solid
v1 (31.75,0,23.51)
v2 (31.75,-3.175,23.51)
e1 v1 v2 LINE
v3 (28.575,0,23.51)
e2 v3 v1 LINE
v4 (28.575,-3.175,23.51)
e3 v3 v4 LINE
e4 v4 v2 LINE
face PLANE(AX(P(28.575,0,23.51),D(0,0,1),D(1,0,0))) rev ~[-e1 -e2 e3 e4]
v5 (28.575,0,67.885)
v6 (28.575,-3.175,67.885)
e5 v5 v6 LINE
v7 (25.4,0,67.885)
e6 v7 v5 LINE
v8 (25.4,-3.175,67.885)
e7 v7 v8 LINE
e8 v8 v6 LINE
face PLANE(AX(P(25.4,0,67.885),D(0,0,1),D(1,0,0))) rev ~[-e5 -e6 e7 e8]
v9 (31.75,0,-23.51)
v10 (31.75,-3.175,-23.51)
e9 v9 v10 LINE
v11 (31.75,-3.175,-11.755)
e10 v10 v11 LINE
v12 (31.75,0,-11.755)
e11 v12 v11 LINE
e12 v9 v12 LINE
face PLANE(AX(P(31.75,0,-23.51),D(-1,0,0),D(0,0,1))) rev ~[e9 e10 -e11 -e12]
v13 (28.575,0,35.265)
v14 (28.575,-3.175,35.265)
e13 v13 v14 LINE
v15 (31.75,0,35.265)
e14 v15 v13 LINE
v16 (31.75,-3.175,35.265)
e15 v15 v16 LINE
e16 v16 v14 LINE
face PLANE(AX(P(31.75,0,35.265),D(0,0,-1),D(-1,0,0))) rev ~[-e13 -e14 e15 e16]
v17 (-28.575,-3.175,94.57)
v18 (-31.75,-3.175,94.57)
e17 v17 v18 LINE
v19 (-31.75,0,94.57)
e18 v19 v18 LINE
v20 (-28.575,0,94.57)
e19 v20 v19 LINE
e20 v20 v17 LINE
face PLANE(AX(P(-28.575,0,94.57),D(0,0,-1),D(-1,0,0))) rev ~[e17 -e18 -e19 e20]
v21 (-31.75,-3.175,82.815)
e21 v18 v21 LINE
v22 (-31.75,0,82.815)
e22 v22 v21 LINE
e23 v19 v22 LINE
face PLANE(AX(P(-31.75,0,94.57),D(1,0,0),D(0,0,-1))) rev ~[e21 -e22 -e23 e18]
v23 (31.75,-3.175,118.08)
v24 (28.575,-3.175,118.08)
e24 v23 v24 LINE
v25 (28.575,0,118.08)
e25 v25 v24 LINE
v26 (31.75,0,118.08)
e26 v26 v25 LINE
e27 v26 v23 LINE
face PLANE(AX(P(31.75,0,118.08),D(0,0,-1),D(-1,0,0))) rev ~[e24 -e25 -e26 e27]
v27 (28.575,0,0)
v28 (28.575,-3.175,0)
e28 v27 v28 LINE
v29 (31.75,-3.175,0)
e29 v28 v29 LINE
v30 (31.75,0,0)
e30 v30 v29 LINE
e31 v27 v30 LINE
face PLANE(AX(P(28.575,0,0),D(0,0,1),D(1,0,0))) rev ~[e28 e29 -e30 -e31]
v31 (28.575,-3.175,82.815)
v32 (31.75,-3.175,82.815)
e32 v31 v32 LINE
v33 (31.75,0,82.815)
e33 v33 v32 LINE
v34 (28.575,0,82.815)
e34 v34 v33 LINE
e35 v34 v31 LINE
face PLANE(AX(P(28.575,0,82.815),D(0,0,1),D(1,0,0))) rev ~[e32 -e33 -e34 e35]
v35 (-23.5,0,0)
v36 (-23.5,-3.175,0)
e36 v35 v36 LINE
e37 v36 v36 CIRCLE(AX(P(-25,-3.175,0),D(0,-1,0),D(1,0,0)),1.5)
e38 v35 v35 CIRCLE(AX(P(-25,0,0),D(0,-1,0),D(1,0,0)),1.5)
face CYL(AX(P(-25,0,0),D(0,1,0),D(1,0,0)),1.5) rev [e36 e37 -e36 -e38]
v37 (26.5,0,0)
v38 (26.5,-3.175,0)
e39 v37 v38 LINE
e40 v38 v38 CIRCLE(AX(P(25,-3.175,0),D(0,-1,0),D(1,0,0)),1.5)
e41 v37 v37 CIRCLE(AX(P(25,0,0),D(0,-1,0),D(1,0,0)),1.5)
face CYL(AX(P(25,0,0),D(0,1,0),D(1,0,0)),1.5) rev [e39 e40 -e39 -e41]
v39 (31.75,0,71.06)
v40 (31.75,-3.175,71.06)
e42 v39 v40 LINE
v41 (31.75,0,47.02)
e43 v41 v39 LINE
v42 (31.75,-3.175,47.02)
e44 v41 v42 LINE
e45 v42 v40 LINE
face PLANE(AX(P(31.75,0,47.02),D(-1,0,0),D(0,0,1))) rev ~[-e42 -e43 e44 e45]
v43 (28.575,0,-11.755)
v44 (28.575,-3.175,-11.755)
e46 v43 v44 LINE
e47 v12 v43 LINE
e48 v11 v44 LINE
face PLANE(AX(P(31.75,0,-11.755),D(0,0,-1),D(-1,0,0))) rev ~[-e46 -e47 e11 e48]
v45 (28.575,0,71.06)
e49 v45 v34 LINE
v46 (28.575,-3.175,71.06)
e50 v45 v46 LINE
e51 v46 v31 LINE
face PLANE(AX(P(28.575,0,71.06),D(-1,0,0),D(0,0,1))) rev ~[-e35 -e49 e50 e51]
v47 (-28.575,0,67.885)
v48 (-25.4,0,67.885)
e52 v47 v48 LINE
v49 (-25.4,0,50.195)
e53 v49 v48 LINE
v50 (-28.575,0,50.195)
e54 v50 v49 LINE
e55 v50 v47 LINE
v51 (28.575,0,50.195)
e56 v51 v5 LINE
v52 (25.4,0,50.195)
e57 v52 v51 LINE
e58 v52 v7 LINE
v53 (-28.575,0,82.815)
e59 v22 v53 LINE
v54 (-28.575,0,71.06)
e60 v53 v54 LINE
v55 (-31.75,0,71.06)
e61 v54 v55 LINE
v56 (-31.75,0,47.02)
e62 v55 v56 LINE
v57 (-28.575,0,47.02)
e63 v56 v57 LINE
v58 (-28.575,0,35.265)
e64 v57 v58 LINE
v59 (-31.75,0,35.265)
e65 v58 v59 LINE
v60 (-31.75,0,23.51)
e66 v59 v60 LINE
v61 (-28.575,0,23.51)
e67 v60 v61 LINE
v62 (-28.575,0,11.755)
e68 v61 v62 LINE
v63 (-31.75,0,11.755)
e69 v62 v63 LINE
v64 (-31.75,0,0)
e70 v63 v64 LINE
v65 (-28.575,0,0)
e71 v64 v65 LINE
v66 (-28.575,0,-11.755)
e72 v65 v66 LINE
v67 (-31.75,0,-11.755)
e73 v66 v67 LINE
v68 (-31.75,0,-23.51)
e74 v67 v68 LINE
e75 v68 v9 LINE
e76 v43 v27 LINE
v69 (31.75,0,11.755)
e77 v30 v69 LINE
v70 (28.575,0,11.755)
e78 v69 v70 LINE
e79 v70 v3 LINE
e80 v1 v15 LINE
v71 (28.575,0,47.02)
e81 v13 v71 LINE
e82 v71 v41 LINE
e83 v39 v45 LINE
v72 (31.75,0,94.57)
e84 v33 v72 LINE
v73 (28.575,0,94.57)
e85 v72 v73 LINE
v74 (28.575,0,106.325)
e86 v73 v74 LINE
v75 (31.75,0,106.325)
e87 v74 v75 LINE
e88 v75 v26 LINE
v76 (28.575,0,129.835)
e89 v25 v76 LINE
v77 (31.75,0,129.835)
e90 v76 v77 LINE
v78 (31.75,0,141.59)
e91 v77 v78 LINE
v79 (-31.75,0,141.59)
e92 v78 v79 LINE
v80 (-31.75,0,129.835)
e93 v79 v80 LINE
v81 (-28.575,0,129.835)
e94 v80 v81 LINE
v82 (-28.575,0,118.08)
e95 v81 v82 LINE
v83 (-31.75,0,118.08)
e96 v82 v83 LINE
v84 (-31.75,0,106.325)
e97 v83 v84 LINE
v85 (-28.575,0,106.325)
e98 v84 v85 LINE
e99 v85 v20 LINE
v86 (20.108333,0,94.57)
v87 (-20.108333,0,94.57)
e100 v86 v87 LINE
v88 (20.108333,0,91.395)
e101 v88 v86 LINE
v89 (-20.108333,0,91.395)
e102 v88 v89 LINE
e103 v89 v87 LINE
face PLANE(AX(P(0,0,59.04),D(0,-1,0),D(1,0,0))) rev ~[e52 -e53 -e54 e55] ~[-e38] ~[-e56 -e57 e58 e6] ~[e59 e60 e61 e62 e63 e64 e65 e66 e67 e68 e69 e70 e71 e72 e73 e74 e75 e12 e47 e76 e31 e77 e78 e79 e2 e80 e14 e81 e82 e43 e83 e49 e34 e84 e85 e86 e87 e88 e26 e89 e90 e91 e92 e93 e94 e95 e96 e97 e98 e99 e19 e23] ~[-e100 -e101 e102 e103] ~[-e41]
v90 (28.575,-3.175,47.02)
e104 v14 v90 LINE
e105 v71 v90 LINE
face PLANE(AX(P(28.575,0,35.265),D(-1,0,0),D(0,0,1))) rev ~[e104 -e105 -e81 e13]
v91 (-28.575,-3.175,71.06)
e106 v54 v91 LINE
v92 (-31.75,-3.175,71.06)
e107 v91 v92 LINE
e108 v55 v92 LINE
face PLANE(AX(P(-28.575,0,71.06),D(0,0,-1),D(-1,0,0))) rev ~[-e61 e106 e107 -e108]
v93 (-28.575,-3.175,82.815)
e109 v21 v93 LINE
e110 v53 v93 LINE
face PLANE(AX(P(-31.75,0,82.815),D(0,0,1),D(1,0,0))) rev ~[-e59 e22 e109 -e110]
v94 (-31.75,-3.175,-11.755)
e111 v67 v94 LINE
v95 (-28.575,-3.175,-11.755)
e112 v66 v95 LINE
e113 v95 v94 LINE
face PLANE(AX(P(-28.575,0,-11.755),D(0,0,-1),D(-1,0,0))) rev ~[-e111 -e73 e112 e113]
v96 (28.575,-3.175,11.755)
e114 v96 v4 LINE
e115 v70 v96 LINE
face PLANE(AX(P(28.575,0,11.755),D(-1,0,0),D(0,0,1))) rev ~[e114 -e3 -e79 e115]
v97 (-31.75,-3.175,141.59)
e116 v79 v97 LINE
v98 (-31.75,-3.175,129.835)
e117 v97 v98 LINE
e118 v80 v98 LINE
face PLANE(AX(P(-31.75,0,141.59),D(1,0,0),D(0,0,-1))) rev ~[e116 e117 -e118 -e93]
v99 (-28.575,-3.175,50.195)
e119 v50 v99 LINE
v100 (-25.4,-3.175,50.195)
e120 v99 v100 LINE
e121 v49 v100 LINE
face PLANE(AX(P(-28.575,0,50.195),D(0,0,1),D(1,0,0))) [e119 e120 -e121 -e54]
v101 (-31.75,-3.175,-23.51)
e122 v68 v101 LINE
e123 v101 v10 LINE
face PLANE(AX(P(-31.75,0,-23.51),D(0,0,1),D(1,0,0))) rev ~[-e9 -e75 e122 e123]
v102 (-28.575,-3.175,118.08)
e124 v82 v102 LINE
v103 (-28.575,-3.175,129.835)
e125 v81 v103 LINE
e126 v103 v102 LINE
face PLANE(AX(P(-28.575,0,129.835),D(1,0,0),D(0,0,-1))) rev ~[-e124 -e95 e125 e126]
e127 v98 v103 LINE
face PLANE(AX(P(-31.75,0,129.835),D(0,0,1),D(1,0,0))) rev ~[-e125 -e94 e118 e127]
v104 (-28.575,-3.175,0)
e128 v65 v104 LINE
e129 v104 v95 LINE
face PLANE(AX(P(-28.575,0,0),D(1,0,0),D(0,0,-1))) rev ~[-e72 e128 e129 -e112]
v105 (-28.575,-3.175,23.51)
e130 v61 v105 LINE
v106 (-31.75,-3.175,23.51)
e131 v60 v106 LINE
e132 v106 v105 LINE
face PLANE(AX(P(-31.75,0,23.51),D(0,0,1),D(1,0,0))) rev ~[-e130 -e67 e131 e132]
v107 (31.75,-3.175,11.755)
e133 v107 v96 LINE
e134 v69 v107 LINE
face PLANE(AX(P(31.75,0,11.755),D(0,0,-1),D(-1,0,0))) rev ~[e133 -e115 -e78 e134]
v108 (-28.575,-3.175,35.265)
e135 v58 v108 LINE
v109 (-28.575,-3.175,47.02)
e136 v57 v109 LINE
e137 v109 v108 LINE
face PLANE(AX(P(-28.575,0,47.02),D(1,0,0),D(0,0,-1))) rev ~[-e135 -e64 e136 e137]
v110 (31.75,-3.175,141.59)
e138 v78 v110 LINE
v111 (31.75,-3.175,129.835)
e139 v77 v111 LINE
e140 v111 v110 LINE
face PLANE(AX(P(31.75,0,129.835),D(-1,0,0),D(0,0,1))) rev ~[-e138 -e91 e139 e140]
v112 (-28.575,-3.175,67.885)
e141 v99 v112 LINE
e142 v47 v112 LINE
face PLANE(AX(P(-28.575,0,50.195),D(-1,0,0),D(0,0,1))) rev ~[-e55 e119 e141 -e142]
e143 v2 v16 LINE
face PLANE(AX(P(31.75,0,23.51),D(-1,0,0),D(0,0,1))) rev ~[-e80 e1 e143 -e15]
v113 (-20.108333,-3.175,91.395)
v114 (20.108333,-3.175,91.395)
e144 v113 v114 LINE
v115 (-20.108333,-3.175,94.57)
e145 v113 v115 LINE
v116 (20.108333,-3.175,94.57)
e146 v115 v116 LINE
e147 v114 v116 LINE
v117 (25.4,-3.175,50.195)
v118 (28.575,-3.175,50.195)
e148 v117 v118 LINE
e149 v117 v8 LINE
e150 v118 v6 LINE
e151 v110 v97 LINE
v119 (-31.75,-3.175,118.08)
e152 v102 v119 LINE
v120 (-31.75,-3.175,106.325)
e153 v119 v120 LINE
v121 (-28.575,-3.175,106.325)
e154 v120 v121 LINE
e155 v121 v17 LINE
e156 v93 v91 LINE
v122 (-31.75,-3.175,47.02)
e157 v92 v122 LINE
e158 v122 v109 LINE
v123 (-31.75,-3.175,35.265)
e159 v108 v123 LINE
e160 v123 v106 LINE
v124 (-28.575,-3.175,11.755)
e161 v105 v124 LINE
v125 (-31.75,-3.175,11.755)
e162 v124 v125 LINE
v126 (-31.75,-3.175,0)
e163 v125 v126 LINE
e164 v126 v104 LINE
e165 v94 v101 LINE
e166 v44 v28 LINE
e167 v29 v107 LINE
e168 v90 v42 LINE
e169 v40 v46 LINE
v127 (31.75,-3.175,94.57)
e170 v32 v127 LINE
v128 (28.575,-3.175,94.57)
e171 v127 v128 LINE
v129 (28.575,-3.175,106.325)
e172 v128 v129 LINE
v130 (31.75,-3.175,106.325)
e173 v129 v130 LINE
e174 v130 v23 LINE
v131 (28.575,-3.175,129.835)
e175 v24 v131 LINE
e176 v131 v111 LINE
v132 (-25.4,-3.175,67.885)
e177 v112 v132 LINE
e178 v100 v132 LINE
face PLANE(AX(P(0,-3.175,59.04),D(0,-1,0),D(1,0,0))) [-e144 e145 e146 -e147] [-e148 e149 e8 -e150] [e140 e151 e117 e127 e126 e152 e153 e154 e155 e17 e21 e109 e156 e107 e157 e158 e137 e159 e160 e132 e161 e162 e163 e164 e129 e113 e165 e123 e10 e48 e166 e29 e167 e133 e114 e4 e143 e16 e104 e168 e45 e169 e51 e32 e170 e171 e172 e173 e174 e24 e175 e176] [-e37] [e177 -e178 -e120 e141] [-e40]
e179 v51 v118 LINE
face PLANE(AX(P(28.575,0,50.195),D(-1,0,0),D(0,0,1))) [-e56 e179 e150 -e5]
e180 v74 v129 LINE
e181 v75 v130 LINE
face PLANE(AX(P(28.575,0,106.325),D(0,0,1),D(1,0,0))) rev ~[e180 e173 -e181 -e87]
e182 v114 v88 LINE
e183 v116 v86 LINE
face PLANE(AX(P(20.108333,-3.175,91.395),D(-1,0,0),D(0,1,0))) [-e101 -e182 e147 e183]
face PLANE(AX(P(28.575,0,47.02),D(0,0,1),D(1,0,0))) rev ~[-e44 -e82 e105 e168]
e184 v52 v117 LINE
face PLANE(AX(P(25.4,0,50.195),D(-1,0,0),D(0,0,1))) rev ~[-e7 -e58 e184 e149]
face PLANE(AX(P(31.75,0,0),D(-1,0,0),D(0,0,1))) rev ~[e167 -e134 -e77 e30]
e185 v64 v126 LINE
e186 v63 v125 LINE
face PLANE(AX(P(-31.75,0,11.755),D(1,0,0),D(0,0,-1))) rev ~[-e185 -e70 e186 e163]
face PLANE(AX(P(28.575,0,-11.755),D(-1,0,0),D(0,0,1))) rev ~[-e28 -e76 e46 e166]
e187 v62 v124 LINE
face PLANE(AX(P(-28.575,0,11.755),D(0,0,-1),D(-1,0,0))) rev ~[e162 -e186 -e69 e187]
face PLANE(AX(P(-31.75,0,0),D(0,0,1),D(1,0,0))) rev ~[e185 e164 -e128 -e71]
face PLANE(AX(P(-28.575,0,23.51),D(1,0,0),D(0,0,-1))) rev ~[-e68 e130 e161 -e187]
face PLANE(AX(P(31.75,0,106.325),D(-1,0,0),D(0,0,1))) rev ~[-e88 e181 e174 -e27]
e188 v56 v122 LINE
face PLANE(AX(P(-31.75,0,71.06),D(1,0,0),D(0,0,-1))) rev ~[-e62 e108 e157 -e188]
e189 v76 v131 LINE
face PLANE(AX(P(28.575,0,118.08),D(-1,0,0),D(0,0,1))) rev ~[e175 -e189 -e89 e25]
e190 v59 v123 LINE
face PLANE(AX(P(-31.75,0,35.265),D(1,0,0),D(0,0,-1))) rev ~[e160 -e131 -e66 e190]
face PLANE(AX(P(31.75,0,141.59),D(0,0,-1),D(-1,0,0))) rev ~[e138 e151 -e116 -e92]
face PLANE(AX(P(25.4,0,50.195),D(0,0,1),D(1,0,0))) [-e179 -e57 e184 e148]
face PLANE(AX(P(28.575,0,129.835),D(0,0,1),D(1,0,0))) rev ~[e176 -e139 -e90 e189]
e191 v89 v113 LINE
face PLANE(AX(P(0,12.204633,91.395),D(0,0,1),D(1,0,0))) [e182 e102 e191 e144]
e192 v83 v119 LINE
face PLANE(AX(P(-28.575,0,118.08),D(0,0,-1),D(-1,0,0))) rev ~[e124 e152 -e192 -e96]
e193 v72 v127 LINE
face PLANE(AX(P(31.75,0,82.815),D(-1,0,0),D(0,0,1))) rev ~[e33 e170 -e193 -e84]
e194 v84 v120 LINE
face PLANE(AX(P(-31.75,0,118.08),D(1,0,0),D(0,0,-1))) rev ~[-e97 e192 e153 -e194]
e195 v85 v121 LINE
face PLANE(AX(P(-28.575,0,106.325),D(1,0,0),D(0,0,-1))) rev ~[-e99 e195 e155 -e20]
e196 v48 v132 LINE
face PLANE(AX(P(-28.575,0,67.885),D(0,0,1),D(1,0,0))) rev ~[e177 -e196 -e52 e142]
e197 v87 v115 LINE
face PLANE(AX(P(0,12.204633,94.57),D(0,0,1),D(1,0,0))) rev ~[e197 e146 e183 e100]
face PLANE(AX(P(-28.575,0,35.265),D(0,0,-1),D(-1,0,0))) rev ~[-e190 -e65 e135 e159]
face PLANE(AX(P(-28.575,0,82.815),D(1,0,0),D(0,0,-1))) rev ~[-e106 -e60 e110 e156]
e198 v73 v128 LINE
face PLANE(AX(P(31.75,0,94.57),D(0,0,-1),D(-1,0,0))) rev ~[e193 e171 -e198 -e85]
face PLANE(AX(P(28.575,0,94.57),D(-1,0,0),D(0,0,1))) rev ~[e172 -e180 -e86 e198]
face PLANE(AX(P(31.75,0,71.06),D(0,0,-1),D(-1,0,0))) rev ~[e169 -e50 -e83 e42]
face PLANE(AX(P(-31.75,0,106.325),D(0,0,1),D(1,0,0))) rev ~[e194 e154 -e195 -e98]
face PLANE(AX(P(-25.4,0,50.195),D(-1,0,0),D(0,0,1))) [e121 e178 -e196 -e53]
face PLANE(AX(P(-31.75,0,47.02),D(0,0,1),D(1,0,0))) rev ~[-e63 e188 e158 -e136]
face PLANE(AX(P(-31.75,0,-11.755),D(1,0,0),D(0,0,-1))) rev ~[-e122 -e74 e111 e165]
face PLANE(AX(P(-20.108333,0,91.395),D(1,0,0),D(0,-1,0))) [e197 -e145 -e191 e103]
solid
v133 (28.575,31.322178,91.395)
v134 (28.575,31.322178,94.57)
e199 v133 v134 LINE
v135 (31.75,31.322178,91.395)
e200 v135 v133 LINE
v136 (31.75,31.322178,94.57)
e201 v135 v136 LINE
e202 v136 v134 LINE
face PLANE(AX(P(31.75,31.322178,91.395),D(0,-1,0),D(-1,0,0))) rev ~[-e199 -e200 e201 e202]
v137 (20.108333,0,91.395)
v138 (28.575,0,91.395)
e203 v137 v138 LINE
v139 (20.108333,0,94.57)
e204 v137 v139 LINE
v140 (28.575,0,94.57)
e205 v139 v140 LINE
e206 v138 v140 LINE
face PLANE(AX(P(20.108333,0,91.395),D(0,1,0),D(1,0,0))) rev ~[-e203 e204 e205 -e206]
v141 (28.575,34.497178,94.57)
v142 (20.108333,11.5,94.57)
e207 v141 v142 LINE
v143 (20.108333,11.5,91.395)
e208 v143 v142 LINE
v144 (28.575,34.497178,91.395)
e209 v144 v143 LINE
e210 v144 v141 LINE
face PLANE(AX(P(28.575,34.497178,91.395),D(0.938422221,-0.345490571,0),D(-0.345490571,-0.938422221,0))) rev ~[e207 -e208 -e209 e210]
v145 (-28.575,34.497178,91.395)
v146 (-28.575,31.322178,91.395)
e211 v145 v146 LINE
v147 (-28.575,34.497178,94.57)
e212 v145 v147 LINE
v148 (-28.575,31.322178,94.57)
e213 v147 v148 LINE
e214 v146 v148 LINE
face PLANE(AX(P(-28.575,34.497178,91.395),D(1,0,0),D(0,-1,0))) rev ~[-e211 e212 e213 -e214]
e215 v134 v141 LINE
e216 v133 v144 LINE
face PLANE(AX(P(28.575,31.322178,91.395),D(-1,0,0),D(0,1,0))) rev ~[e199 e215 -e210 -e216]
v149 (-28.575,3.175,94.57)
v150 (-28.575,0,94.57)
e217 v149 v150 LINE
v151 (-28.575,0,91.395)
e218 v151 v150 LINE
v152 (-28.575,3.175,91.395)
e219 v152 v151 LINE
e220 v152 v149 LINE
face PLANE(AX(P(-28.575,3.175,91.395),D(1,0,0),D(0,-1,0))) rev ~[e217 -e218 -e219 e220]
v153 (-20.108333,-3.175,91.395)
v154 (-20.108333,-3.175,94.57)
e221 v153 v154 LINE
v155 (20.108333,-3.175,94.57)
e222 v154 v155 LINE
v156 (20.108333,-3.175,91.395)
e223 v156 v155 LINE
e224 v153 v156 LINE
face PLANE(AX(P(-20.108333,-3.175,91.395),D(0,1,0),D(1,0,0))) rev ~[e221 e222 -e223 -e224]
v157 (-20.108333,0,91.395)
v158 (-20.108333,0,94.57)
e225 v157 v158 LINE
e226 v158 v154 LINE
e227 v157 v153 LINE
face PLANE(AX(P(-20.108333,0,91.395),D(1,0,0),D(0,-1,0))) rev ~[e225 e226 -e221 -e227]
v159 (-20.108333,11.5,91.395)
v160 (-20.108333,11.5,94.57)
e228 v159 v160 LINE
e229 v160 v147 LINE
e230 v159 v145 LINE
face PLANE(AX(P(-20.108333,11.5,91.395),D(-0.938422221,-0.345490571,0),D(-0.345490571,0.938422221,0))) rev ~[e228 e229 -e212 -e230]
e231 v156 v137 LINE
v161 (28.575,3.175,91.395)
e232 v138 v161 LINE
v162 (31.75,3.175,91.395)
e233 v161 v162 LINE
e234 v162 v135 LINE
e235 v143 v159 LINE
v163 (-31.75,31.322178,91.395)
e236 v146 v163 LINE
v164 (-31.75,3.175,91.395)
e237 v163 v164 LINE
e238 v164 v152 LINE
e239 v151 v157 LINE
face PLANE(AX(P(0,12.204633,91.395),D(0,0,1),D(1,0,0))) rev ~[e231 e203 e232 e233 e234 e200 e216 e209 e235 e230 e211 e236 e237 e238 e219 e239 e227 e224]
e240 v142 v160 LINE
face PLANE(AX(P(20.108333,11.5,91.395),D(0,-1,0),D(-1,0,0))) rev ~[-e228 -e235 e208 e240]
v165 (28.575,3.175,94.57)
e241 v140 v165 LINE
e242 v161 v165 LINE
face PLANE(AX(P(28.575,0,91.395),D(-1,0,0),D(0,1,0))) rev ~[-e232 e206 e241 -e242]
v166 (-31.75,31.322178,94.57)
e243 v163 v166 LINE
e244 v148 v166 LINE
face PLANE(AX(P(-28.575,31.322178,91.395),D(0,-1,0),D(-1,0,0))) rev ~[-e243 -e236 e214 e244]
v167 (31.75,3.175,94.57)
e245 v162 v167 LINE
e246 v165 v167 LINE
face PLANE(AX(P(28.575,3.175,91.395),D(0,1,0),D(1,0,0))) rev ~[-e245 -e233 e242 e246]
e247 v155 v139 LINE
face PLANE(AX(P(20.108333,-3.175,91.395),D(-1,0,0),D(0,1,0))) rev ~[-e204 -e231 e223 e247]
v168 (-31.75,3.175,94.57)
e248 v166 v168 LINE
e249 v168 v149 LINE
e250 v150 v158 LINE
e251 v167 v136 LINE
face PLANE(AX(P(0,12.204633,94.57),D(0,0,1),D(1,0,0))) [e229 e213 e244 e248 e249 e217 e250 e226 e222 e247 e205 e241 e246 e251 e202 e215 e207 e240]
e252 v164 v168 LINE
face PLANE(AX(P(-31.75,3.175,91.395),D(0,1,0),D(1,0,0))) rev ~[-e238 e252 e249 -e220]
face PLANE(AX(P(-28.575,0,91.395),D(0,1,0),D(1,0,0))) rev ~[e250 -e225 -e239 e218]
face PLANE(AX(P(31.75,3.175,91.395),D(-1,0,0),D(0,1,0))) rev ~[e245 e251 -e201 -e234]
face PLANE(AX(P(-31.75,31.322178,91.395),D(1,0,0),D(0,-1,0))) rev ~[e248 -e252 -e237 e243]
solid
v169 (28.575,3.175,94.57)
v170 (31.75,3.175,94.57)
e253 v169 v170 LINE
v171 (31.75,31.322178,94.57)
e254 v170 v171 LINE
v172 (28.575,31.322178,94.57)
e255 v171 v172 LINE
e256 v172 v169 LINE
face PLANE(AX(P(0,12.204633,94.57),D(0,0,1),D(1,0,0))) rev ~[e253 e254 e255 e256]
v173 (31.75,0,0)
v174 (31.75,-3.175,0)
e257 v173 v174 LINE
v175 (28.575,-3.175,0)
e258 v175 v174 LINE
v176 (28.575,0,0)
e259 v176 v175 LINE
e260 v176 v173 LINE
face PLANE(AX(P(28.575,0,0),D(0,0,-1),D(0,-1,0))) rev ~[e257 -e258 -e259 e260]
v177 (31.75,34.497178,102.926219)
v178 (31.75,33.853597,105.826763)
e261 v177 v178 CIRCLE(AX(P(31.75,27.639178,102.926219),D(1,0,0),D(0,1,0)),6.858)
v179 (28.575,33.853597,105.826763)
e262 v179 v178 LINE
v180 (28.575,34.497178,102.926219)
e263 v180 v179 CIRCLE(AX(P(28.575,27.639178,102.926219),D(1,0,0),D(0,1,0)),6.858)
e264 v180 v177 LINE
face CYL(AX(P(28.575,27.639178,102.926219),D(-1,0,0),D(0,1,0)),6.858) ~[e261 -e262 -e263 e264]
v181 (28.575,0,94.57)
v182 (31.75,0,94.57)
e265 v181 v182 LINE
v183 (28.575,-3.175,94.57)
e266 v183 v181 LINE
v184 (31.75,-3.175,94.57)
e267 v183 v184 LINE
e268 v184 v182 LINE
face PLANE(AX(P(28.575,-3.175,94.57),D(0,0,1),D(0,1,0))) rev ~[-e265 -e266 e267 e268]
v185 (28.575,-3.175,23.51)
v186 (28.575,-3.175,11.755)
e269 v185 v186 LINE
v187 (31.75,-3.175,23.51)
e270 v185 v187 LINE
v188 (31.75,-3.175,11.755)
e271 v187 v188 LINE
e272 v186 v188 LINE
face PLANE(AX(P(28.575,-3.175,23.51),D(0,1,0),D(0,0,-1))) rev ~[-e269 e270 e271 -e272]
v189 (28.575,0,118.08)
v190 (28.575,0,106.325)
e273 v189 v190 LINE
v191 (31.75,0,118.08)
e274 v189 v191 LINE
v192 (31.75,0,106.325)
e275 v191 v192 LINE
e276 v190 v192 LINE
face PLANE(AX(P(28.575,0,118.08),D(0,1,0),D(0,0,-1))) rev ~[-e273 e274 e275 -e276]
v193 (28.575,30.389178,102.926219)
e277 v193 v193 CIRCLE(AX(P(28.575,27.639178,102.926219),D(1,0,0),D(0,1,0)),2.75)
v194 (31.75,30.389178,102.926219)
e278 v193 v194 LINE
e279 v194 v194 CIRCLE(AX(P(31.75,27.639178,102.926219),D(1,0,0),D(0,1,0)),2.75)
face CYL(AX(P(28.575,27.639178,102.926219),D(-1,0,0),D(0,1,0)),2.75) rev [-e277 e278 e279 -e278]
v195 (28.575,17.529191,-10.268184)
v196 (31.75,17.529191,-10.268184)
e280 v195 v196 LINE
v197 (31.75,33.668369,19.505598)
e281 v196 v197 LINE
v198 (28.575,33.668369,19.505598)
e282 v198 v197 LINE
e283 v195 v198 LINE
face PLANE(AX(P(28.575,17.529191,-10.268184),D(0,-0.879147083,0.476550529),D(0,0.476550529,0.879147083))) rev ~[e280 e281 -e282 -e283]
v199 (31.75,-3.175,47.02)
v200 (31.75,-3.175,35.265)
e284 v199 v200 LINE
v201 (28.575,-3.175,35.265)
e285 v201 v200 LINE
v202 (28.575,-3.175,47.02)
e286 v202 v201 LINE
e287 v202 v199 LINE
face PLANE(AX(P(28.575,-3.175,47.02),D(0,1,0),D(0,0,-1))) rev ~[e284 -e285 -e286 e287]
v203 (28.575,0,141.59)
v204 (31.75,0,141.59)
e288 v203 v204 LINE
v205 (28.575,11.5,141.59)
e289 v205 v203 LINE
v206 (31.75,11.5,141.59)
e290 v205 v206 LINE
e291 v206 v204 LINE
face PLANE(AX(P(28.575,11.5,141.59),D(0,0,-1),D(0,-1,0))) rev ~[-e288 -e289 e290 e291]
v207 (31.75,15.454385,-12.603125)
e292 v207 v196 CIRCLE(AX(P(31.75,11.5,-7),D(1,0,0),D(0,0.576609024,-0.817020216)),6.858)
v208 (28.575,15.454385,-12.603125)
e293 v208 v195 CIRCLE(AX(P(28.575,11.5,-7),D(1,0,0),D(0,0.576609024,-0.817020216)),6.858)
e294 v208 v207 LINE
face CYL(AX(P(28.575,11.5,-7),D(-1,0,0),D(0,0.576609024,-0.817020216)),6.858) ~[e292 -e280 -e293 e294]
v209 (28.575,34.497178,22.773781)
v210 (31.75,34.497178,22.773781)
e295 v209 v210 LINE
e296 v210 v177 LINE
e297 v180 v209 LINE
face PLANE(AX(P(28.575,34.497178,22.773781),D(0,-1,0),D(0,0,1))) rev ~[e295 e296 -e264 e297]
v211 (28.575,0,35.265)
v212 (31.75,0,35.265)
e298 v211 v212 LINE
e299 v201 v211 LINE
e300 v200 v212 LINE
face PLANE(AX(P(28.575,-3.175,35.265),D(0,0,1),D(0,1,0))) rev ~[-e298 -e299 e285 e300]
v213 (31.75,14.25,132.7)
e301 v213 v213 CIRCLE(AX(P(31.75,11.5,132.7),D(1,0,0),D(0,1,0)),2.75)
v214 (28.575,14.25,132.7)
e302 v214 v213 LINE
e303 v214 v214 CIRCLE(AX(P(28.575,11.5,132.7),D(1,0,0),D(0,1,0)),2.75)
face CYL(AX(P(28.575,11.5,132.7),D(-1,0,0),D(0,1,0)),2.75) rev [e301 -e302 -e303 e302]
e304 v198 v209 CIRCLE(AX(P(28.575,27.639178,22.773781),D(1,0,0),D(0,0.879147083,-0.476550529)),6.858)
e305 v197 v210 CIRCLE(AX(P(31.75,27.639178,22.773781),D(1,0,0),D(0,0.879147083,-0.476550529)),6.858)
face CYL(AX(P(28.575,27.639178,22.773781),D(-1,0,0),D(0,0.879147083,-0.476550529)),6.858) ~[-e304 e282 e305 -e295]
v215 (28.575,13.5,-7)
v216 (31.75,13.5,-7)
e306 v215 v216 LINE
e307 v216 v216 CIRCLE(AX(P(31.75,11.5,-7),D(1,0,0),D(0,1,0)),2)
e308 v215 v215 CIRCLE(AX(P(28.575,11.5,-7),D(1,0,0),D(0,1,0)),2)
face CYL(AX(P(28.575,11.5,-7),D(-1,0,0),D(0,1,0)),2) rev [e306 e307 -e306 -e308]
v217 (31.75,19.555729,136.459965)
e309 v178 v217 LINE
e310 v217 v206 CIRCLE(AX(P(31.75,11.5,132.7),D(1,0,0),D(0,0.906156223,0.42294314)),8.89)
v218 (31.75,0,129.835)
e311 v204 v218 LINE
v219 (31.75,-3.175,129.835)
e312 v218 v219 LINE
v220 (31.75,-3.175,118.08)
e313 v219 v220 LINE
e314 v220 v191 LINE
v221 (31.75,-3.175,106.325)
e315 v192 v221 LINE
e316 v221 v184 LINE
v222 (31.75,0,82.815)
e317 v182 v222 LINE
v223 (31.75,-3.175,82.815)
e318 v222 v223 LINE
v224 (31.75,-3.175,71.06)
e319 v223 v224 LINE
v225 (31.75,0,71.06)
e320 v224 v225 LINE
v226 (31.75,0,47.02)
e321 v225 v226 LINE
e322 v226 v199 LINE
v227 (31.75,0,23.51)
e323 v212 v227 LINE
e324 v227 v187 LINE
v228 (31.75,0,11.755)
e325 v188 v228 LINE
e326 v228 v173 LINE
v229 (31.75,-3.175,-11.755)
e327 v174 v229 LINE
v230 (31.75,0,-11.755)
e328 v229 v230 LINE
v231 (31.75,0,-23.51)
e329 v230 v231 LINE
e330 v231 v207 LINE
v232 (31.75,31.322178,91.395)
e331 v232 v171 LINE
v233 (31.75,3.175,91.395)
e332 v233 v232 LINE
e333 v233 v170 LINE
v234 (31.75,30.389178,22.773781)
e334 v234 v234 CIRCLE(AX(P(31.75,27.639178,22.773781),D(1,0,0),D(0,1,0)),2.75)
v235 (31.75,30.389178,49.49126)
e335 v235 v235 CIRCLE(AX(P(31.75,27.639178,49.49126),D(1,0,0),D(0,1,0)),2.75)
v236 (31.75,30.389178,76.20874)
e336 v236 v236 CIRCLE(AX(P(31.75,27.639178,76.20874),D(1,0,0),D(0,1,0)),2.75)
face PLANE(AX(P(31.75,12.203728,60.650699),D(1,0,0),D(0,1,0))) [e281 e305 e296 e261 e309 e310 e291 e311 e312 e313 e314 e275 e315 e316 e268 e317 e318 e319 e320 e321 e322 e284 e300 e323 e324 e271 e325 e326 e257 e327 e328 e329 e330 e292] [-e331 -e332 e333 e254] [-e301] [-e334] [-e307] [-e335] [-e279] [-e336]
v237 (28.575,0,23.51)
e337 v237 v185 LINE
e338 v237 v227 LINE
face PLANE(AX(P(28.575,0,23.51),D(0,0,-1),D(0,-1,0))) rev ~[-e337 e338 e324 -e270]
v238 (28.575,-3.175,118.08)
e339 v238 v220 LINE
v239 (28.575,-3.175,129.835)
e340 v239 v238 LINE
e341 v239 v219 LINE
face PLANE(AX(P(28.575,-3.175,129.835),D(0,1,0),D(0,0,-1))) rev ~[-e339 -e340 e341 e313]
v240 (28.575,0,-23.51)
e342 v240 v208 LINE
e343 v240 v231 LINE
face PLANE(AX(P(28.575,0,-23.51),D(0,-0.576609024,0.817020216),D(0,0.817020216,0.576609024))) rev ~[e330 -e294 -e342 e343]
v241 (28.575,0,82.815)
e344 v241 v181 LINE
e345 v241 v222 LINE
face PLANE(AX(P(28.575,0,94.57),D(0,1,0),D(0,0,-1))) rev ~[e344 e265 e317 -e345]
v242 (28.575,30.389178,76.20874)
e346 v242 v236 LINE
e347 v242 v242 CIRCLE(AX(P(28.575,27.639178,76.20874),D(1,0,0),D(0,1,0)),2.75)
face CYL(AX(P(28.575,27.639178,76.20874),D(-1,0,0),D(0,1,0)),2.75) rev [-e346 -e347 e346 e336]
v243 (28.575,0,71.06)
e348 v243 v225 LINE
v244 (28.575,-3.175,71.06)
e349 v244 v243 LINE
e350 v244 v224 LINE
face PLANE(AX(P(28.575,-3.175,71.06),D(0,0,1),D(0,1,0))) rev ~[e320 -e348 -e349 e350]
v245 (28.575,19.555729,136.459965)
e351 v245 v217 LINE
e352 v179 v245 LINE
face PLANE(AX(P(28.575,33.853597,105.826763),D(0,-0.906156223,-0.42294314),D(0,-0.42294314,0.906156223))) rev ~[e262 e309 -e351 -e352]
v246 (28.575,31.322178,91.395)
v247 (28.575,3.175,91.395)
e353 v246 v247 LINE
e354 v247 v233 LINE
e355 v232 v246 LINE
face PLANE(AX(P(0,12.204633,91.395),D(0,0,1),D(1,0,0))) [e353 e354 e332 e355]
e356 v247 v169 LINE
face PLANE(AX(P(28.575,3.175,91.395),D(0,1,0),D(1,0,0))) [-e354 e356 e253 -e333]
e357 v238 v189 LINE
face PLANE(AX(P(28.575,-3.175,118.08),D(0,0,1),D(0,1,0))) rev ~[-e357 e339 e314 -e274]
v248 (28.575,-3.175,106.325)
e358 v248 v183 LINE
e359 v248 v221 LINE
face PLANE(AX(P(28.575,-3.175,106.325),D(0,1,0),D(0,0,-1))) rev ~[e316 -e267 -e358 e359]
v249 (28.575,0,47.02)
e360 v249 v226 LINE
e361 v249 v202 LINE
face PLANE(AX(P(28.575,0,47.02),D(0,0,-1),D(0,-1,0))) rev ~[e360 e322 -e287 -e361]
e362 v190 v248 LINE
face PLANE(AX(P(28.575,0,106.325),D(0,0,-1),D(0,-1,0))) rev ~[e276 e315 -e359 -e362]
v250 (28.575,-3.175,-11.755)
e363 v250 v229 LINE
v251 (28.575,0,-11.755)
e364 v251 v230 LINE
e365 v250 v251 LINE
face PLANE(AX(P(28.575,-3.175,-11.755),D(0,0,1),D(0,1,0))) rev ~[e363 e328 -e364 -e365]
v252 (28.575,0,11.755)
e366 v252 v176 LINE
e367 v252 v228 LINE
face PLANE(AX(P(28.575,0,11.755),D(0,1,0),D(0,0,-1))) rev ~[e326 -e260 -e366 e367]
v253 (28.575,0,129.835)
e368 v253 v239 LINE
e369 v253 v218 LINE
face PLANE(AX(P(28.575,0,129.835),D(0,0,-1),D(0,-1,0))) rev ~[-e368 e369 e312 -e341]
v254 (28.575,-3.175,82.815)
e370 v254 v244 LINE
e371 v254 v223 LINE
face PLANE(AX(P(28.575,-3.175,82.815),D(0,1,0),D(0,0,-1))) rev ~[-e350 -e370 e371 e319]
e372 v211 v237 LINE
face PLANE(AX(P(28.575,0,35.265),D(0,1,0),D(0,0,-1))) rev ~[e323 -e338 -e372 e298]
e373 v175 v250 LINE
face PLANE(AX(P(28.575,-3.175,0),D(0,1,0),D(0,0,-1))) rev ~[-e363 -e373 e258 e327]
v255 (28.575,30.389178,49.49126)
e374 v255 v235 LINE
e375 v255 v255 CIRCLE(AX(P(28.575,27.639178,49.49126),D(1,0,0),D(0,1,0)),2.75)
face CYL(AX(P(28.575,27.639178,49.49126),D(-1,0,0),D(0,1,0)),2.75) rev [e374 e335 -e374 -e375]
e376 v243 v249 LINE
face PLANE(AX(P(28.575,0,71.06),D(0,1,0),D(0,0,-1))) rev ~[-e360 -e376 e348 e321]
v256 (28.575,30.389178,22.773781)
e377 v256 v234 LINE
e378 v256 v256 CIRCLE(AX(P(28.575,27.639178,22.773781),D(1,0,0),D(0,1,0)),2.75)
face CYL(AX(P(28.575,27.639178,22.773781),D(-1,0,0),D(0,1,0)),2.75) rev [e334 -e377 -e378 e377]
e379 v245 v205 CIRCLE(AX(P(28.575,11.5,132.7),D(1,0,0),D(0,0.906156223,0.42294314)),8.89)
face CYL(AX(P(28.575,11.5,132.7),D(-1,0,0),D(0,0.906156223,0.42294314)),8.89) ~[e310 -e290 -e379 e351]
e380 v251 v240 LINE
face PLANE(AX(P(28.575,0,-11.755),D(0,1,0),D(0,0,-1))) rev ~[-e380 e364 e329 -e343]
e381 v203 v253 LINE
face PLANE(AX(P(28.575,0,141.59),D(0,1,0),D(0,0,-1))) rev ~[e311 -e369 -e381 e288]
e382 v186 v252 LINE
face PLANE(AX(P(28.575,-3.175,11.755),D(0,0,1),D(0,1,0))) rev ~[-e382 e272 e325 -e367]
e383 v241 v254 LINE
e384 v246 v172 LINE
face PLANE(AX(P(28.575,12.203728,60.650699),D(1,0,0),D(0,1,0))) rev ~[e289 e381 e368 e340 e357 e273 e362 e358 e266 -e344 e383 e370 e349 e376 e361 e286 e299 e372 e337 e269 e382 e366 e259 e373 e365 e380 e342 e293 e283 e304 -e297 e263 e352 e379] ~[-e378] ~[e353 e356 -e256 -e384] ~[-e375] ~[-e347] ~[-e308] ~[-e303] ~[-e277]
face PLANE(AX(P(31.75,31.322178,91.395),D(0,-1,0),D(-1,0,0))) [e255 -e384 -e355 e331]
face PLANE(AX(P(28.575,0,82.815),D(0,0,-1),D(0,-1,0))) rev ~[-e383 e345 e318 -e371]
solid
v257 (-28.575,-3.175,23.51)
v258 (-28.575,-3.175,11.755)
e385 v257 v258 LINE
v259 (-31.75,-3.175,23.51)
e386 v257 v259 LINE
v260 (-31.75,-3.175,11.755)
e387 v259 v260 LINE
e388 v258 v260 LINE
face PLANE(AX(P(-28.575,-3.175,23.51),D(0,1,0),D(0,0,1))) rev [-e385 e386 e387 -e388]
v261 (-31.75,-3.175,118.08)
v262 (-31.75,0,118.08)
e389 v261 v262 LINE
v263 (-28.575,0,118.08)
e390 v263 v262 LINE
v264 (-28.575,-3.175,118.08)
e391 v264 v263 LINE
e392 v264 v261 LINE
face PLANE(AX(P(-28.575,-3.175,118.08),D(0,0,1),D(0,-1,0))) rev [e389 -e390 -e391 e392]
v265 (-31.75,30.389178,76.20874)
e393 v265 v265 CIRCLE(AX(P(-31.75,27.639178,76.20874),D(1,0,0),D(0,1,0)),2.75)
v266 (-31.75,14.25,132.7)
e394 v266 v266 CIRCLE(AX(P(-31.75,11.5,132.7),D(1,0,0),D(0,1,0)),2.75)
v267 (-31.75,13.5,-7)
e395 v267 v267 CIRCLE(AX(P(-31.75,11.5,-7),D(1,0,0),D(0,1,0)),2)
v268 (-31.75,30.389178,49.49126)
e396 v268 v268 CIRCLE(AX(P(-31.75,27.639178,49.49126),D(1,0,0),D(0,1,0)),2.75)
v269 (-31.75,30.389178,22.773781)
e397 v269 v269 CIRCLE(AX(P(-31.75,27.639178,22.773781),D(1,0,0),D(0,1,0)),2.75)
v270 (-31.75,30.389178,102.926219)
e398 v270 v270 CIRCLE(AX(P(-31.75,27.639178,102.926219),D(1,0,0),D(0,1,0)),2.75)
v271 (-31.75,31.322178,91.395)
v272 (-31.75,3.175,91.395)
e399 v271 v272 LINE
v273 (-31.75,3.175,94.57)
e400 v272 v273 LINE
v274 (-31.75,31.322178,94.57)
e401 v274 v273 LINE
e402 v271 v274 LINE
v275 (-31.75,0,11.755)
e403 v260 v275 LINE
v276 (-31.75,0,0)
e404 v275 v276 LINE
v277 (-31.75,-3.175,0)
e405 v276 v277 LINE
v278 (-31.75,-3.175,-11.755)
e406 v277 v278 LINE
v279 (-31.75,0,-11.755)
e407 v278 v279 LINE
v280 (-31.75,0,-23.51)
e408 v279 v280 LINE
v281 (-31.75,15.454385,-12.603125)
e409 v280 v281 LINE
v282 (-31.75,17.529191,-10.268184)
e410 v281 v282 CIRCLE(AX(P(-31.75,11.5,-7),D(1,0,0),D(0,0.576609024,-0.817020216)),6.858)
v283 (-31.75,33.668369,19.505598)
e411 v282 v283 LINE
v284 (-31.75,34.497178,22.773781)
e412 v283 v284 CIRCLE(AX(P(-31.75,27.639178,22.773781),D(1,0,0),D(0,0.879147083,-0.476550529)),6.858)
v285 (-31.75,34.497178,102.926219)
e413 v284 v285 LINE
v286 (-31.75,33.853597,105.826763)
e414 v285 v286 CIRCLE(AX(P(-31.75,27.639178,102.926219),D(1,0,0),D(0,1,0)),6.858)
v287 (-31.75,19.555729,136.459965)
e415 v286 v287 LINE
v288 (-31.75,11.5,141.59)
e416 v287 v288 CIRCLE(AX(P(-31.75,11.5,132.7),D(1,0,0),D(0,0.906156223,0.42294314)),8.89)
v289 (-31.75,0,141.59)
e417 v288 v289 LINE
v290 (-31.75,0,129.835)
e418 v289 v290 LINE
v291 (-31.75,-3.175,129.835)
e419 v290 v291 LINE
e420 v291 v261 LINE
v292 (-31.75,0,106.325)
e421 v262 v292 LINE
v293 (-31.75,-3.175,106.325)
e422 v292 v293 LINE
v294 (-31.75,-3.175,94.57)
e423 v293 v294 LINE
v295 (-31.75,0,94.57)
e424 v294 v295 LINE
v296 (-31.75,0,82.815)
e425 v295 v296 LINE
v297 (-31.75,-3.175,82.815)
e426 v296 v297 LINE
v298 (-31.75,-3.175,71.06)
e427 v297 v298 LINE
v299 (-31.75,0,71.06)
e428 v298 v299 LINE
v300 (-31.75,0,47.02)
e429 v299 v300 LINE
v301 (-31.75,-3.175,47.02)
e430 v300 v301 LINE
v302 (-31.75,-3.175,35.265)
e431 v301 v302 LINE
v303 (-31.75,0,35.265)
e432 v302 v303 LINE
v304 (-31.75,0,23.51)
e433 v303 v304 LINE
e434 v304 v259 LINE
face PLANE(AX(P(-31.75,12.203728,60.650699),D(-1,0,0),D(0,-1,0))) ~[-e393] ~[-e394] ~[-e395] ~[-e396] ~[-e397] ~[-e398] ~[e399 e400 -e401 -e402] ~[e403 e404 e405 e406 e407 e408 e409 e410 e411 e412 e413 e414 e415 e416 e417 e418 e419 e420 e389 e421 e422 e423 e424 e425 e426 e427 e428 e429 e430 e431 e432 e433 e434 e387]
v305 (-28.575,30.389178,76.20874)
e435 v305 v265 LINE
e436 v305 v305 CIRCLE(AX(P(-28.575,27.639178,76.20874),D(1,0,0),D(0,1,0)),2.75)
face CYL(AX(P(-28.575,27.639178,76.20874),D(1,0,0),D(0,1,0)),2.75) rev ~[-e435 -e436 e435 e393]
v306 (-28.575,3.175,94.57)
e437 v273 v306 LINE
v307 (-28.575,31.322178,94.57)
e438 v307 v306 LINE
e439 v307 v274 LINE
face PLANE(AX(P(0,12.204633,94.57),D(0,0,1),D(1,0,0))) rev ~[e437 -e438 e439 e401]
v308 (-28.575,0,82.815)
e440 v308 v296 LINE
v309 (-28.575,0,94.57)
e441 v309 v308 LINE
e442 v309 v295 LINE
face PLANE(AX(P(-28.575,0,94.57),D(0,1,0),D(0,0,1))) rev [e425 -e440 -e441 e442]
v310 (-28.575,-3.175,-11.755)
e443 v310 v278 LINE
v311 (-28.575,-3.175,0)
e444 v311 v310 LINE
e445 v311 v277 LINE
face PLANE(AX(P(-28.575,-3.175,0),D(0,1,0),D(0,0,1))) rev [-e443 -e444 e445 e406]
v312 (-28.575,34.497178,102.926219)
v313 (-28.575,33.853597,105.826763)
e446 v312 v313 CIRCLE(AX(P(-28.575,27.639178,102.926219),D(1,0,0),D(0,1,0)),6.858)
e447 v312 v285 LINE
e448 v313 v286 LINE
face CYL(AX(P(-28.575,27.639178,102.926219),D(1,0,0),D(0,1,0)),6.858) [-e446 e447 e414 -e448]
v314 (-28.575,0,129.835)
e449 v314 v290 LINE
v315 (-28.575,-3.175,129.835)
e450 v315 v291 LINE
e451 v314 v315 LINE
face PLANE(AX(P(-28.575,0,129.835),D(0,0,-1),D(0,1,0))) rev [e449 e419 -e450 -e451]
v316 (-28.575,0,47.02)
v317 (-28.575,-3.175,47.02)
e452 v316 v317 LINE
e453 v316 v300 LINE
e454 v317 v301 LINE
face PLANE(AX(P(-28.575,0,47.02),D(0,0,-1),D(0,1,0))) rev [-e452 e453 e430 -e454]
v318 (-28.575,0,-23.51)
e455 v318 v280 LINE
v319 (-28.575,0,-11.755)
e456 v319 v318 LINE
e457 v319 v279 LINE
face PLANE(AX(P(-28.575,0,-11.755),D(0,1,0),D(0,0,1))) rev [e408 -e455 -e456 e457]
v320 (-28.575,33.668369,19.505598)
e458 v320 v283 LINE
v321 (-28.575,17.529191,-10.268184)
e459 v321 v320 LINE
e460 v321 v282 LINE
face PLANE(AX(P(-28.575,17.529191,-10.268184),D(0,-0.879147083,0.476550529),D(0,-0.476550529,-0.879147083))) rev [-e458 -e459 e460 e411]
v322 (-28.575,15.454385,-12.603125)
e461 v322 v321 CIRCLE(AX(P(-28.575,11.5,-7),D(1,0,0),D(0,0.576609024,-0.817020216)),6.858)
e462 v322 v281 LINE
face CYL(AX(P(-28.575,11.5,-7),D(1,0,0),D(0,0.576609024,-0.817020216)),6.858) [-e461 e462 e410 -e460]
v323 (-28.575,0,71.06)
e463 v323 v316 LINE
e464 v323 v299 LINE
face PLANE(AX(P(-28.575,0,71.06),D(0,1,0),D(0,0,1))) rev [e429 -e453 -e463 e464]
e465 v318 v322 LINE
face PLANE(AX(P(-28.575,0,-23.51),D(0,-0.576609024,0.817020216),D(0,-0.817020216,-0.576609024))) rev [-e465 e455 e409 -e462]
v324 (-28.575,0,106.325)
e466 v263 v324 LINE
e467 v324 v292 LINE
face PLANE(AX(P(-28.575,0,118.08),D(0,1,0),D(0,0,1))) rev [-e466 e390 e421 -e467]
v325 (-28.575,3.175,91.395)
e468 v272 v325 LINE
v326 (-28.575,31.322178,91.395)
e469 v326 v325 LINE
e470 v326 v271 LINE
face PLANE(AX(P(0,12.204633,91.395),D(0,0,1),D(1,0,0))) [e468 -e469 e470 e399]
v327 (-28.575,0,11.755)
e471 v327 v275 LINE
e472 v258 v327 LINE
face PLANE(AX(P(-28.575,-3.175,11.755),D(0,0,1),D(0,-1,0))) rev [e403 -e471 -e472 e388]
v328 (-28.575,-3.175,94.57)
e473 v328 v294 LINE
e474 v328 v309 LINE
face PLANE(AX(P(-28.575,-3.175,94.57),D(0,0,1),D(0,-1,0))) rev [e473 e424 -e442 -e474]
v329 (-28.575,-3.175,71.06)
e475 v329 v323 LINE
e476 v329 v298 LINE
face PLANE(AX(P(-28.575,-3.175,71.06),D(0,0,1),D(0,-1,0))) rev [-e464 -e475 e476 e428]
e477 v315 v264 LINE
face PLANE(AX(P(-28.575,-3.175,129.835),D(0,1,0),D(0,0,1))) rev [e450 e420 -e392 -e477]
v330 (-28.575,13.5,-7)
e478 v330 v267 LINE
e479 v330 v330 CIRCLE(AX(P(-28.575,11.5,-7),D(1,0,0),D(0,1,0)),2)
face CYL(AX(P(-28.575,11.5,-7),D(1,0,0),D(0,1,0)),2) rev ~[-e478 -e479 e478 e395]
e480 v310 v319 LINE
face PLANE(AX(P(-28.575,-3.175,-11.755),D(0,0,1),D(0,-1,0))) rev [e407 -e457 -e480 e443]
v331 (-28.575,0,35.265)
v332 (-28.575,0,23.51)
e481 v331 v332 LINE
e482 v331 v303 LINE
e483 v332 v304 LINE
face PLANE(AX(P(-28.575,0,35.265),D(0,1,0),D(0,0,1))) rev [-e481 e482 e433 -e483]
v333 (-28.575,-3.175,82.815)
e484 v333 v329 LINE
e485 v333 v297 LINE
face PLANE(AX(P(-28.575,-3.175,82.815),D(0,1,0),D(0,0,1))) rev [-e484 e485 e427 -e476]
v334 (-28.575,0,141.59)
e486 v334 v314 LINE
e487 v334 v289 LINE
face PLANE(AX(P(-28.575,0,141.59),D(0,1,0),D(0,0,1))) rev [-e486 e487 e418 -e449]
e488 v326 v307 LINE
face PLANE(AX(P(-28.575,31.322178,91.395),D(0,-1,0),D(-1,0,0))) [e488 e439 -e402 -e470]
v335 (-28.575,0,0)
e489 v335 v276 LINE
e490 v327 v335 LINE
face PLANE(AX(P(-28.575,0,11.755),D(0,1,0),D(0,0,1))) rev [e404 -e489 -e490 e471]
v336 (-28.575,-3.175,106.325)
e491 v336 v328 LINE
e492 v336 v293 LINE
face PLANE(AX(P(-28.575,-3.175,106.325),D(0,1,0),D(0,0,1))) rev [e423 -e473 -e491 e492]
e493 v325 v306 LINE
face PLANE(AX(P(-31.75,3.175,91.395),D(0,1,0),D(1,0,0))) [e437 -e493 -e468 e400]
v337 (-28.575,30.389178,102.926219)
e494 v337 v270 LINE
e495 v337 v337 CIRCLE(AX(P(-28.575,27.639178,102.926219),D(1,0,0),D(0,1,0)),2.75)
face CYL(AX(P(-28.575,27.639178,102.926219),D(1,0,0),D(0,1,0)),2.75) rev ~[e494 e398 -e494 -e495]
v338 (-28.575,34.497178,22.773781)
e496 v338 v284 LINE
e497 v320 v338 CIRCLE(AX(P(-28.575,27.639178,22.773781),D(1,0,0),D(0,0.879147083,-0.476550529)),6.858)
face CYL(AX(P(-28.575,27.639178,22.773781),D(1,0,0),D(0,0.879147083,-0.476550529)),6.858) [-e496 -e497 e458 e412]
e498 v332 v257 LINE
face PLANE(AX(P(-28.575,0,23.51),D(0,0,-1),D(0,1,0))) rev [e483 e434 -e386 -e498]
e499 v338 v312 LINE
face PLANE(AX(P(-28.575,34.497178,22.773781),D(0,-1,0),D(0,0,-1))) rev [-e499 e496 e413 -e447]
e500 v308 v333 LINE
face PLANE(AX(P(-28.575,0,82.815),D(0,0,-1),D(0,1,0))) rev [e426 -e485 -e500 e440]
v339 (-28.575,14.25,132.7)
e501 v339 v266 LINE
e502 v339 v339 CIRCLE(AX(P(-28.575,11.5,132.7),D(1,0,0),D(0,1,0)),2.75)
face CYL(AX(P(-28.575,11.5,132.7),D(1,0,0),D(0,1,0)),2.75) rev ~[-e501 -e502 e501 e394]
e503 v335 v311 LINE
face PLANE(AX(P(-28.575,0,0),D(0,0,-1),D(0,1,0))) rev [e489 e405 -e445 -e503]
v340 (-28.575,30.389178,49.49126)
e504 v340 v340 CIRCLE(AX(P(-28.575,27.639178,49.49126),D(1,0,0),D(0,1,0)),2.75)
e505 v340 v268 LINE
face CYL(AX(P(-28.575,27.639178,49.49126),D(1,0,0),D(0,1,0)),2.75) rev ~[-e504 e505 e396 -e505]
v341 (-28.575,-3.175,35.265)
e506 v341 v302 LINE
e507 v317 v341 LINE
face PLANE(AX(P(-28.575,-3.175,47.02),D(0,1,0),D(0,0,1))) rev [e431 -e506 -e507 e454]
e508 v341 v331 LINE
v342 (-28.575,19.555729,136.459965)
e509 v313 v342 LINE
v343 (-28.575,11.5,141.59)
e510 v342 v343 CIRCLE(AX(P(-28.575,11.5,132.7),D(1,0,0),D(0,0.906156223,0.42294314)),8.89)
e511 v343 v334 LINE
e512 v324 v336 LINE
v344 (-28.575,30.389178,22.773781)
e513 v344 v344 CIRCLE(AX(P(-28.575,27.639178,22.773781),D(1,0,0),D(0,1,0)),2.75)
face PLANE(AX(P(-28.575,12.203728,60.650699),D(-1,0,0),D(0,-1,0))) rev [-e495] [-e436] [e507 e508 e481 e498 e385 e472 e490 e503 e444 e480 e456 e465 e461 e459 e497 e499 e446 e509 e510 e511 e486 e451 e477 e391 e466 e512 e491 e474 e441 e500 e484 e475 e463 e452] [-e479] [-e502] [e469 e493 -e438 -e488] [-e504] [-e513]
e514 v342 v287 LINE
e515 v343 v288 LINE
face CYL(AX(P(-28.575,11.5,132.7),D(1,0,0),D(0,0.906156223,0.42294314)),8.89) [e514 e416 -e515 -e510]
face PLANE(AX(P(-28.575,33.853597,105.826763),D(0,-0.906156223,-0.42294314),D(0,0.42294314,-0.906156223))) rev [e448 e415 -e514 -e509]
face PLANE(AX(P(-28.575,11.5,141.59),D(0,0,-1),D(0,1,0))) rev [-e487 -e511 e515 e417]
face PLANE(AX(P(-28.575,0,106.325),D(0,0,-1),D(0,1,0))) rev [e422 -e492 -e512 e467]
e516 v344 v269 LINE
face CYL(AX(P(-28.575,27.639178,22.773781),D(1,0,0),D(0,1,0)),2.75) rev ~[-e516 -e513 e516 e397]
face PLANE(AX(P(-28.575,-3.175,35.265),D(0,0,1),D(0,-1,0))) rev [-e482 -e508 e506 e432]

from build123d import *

# Parameters (mm, degrees)
F3_R      = 1.5
F3_W      = 3.175
F3_H      = 17.69
F4_DEPTH  = 3.175
F6_START  = 28.575
F5_R      = 2
F5_R_2    = 2.75
F6_DEPTH  = 3.175
F9_START  = 91.395
F9_DEPTH  = 3.175
F10_START = 91.395
F10_DEPTH = 3.175


# Not quite as in the source:
# - a variable given as a bare number and used for a length is read in inches; the dataset says mm whatever the document's units were


with BuildPart() as f4:
    # F3 (on Front) → F4 (new body)
    with BuildSketch(Plane.XZ):
        Polygon((-31.75, -23.51), (0, -23.51), (31.75, -23.51), (31.75, -11.755), (28.575, -11.755), (28.575, 0), (31.75, 0), (31.75, 11.755), (28.575, 11.755), (28.575, 23.51), (31.75, 23.51), (31.75, 35.265), (28.575, 35.265), (28.575, 47.02), (31.75, 47.02), (31.75, 59.04), (31.75, 71.06), (28.575, 71.06), (28.575, 82.815), (31.75, 82.815), (31.75, 94.57), (28.575, 94.57), (28.575, 106.325), (31.75, 106.325), (31.75, 118.08), (28.575, 118.08), (28.575, 129.835), (31.75, 129.835), (31.75, 141.59), (0, 141.59), (-31.75, 141.59), (-31.75, 129.835), (-28.575, 129.835), (-28.575, 118.08), (-31.75, 118.08), (-31.75, 106.325), (-28.575, 106.325), (-28.575, 94.57), (-31.75, 94.57), (-31.75, 82.815), (-28.575, 82.815), (-28.575, 71.06), (-31.75, 71.06), (-31.75, 59.04), (-31.75, 47.02), (-28.575, 47.02), (-28.575, 35.265), (-31.75, 35.265), (-31.75, 23.51), (-28.575, 23.51), (-28.575, 11.755), (-31.75, 11.755), (-31.75, 0), (-28.575, 0), (-28.575, -11.755), (-31.75, -11.755), align=None)
        with Locations((-25, 0)):
            Circle(F3_R, mode=Mode.SUBTRACT)
        with Locations((-26.9875, 59.04)):
            Rectangle(F3_W, F3_H, mode=Mode.SUBTRACT)
        with Locations((25, 0)):
            Circle(F3_R, mode=Mode.SUBTRACT)
        with Locations((26.9875, 59.04)):
            Rectangle(F3_W, F3_H, mode=Mode.SUBTRACT)
    extrude(amount=F4_DEPTH)


with BuildPart() as f6:
    # F5 (on Right) → F6 (new body)
    with BuildSketch(Plane.YZ.offset(F6_START)):
        with BuildLine():
            Line((0, -11.755), (0, -23.51))
            Line((0, -23.51), (15.4543846839, -12.6031246436))
            ThreePointArc((15.4543846839, -12.6031246436), (16.6264931323, -11.5553520352), (17.5291906941, -10.2681835282))
            Line((17.5291906941, -10.2681835282), (33.6683686113, 19.5055976772))
            ThreePointArc((33.6683686113, 19.5055976772), (34.286747164, 21.0879617874), (34.4971779172, 22.7737812054))
            Line((34.4971779172, 22.7737812054), (34.4971779172, 102.9262187946))
            ThreePointArc((34.4971779172, 102.9262187946), (34.3343497631, 104.4117617775), (33.8535972949, 105.8267628468))
            Line((33.8535972949, 105.8267628468), (19.5557288229, 136.4599645122))
            ThreePointArc((19.5557288229, 136.4599645122), (16.2752494954, 140.1986060209), (11.5, 141.59))
            Line((11.5, 141.59), (0, 141.59))
            Line((0, 141.59), (0, 129.835))
            Line((0, 129.835), (-3.175, 129.835))
            Line((-3.175, 129.835), (-3.175, 118.08))
            Line((-3.175, 118.08), (0, 118.08))
            Line((0, 118.08), (0, 106.325))
            Line((0, 106.325), (-3.175, 106.325))
            Line((-3.175, 106.325), (-3.175, 94.57))
            Line((-3.175, 94.57), (0, 94.57))
            Line((0, 94.57), (0, 82.815))
            Line((0, 82.815), (-3.175, 82.815))
            Line((-3.175, 82.815), (-3.175, 71.06))
            Line((-3.175, 71.06), (0, 71.06))
            Line((0, 71.06), (0, 59.04))
            Line((0, 59.04), (0, 47.02))
            Line((0, 47.02), (-3.175, 47.02))
            Line((-3.175, 47.02), (-3.175, 35.265))
            Line((-3.175, 35.265), (0, 35.265))
            Line((0, 35.265), (0, 23.51))
            Line((0, 23.51), (-3.175, 23.51))
            Line((-3.175, 23.51), (-3.175, 11.755))
            Line((-3.175, 11.755), (0, 11.755))
            Line((0, 11.755), (0, 0))
            Line((0, 0), (-3.175, 0))
            Line((-3.175, 0), (-3.175, -11.755))
            Line((-3.175, -11.755), (0, -11.755))
        make_face()
        with Locations((11.5, -7)):
            Circle(F5_R, mode=Mode.SUBTRACT)
        with Locations((27.6391779172, 22.7737812054)):
            Circle(F5_R_2, mode=Mode.SUBTRACT)
        with Locations((27.6391779172, 49.4912604018)):
            Circle(F5_R_2, mode=Mode.SUBTRACT)
        with Locations((11.5, 132.7)):
            Circle(F5_R_2, mode=Mode.SUBTRACT)
        with Locations((27.6391779172, 76.2087395982)):
            Circle(F5_R_2, mode=Mode.SUBTRACT)
        with Locations((27.6391779172, 102.9262187946)):
            Circle(F5_R_2, mode=Mode.SUBTRACT)
    extrude(amount=F6_DEPTH)


with BuildPart() as f7_1:
    # F7: instance of F6
    add(f6.part.mirror(Plane.YZ))


with BuildPart() as f9_tool:
    # F8 (on Top) → F9 (new body)
    with BuildSketch(Plane.XY.offset(F9_START)):
        Polygon((20.1083333333, 11.5), (0, 11.5), (-20.1083333333, 11.5), (-28.575, 34.4971779172), (-28.575, 31.3221779172), (-31.75, 31.3221779172), (-31.75, 3.175), (-28.575, 3.175), (-28.575, 0), (-20.1083333333, 0), (-20.1083333333, -3.175), (0, -3.175), (20.1083333333, -3.175), (20.1083333333, 0), (28.575, 0), (28.575, 3.175), (31.75, 3.175), (31.75, 31.3221779172), (28.575, 31.3221779172), (28.575, 34.4971779172), align=None)
    extrude(amount=F9_DEPTH)


with BuildPart() as f4_1:
    add(f4.part)

    # F9: cut by f9_tool
    add(f9_tool.part, mode=Mode.SUBTRACT)


with BuildPart() as f6_1:
    add(f6.part)

    # F9: cut by f9_tool
    add(f9_tool.part, mode=Mode.SUBTRACT)


with BuildPart() as f7_1_1:
    add(f7_1.part)

    # F9: cut by f9_tool
    add(f9_tool.part, mode=Mode.SUBTRACT)


with BuildPart() as f10:
    # F8 (on Top) → F10 (new body)
    with BuildSketch(Plane.XY.offset(F10_START)):
        Polygon((20.1083333333, 11.5), (0, 11.5), (-20.1083333333, 11.5), (-28.575, 34.4971779172), (-28.575, 31.3221779172), (-31.75, 31.3221779172), (-31.75, 3.175), (-28.575, 3.175), (-28.575, 0), (-20.1083333333, 0), (-20.1083333333, -3.175), (0, -3.175), (20.1083333333, -3.175), (20.1083333333, 0), (28.575, 0), (28.575, 3.175), (31.75, 3.175), (31.75, 31.3221779172), (28.575, 31.3221779172), (28.575, 34.4971779172), align=None)
    extrude(amount=F10_DEPTH)


solid = Compound([f4_1.part, f6_1.part, f7_1_1.part, f10.part])
